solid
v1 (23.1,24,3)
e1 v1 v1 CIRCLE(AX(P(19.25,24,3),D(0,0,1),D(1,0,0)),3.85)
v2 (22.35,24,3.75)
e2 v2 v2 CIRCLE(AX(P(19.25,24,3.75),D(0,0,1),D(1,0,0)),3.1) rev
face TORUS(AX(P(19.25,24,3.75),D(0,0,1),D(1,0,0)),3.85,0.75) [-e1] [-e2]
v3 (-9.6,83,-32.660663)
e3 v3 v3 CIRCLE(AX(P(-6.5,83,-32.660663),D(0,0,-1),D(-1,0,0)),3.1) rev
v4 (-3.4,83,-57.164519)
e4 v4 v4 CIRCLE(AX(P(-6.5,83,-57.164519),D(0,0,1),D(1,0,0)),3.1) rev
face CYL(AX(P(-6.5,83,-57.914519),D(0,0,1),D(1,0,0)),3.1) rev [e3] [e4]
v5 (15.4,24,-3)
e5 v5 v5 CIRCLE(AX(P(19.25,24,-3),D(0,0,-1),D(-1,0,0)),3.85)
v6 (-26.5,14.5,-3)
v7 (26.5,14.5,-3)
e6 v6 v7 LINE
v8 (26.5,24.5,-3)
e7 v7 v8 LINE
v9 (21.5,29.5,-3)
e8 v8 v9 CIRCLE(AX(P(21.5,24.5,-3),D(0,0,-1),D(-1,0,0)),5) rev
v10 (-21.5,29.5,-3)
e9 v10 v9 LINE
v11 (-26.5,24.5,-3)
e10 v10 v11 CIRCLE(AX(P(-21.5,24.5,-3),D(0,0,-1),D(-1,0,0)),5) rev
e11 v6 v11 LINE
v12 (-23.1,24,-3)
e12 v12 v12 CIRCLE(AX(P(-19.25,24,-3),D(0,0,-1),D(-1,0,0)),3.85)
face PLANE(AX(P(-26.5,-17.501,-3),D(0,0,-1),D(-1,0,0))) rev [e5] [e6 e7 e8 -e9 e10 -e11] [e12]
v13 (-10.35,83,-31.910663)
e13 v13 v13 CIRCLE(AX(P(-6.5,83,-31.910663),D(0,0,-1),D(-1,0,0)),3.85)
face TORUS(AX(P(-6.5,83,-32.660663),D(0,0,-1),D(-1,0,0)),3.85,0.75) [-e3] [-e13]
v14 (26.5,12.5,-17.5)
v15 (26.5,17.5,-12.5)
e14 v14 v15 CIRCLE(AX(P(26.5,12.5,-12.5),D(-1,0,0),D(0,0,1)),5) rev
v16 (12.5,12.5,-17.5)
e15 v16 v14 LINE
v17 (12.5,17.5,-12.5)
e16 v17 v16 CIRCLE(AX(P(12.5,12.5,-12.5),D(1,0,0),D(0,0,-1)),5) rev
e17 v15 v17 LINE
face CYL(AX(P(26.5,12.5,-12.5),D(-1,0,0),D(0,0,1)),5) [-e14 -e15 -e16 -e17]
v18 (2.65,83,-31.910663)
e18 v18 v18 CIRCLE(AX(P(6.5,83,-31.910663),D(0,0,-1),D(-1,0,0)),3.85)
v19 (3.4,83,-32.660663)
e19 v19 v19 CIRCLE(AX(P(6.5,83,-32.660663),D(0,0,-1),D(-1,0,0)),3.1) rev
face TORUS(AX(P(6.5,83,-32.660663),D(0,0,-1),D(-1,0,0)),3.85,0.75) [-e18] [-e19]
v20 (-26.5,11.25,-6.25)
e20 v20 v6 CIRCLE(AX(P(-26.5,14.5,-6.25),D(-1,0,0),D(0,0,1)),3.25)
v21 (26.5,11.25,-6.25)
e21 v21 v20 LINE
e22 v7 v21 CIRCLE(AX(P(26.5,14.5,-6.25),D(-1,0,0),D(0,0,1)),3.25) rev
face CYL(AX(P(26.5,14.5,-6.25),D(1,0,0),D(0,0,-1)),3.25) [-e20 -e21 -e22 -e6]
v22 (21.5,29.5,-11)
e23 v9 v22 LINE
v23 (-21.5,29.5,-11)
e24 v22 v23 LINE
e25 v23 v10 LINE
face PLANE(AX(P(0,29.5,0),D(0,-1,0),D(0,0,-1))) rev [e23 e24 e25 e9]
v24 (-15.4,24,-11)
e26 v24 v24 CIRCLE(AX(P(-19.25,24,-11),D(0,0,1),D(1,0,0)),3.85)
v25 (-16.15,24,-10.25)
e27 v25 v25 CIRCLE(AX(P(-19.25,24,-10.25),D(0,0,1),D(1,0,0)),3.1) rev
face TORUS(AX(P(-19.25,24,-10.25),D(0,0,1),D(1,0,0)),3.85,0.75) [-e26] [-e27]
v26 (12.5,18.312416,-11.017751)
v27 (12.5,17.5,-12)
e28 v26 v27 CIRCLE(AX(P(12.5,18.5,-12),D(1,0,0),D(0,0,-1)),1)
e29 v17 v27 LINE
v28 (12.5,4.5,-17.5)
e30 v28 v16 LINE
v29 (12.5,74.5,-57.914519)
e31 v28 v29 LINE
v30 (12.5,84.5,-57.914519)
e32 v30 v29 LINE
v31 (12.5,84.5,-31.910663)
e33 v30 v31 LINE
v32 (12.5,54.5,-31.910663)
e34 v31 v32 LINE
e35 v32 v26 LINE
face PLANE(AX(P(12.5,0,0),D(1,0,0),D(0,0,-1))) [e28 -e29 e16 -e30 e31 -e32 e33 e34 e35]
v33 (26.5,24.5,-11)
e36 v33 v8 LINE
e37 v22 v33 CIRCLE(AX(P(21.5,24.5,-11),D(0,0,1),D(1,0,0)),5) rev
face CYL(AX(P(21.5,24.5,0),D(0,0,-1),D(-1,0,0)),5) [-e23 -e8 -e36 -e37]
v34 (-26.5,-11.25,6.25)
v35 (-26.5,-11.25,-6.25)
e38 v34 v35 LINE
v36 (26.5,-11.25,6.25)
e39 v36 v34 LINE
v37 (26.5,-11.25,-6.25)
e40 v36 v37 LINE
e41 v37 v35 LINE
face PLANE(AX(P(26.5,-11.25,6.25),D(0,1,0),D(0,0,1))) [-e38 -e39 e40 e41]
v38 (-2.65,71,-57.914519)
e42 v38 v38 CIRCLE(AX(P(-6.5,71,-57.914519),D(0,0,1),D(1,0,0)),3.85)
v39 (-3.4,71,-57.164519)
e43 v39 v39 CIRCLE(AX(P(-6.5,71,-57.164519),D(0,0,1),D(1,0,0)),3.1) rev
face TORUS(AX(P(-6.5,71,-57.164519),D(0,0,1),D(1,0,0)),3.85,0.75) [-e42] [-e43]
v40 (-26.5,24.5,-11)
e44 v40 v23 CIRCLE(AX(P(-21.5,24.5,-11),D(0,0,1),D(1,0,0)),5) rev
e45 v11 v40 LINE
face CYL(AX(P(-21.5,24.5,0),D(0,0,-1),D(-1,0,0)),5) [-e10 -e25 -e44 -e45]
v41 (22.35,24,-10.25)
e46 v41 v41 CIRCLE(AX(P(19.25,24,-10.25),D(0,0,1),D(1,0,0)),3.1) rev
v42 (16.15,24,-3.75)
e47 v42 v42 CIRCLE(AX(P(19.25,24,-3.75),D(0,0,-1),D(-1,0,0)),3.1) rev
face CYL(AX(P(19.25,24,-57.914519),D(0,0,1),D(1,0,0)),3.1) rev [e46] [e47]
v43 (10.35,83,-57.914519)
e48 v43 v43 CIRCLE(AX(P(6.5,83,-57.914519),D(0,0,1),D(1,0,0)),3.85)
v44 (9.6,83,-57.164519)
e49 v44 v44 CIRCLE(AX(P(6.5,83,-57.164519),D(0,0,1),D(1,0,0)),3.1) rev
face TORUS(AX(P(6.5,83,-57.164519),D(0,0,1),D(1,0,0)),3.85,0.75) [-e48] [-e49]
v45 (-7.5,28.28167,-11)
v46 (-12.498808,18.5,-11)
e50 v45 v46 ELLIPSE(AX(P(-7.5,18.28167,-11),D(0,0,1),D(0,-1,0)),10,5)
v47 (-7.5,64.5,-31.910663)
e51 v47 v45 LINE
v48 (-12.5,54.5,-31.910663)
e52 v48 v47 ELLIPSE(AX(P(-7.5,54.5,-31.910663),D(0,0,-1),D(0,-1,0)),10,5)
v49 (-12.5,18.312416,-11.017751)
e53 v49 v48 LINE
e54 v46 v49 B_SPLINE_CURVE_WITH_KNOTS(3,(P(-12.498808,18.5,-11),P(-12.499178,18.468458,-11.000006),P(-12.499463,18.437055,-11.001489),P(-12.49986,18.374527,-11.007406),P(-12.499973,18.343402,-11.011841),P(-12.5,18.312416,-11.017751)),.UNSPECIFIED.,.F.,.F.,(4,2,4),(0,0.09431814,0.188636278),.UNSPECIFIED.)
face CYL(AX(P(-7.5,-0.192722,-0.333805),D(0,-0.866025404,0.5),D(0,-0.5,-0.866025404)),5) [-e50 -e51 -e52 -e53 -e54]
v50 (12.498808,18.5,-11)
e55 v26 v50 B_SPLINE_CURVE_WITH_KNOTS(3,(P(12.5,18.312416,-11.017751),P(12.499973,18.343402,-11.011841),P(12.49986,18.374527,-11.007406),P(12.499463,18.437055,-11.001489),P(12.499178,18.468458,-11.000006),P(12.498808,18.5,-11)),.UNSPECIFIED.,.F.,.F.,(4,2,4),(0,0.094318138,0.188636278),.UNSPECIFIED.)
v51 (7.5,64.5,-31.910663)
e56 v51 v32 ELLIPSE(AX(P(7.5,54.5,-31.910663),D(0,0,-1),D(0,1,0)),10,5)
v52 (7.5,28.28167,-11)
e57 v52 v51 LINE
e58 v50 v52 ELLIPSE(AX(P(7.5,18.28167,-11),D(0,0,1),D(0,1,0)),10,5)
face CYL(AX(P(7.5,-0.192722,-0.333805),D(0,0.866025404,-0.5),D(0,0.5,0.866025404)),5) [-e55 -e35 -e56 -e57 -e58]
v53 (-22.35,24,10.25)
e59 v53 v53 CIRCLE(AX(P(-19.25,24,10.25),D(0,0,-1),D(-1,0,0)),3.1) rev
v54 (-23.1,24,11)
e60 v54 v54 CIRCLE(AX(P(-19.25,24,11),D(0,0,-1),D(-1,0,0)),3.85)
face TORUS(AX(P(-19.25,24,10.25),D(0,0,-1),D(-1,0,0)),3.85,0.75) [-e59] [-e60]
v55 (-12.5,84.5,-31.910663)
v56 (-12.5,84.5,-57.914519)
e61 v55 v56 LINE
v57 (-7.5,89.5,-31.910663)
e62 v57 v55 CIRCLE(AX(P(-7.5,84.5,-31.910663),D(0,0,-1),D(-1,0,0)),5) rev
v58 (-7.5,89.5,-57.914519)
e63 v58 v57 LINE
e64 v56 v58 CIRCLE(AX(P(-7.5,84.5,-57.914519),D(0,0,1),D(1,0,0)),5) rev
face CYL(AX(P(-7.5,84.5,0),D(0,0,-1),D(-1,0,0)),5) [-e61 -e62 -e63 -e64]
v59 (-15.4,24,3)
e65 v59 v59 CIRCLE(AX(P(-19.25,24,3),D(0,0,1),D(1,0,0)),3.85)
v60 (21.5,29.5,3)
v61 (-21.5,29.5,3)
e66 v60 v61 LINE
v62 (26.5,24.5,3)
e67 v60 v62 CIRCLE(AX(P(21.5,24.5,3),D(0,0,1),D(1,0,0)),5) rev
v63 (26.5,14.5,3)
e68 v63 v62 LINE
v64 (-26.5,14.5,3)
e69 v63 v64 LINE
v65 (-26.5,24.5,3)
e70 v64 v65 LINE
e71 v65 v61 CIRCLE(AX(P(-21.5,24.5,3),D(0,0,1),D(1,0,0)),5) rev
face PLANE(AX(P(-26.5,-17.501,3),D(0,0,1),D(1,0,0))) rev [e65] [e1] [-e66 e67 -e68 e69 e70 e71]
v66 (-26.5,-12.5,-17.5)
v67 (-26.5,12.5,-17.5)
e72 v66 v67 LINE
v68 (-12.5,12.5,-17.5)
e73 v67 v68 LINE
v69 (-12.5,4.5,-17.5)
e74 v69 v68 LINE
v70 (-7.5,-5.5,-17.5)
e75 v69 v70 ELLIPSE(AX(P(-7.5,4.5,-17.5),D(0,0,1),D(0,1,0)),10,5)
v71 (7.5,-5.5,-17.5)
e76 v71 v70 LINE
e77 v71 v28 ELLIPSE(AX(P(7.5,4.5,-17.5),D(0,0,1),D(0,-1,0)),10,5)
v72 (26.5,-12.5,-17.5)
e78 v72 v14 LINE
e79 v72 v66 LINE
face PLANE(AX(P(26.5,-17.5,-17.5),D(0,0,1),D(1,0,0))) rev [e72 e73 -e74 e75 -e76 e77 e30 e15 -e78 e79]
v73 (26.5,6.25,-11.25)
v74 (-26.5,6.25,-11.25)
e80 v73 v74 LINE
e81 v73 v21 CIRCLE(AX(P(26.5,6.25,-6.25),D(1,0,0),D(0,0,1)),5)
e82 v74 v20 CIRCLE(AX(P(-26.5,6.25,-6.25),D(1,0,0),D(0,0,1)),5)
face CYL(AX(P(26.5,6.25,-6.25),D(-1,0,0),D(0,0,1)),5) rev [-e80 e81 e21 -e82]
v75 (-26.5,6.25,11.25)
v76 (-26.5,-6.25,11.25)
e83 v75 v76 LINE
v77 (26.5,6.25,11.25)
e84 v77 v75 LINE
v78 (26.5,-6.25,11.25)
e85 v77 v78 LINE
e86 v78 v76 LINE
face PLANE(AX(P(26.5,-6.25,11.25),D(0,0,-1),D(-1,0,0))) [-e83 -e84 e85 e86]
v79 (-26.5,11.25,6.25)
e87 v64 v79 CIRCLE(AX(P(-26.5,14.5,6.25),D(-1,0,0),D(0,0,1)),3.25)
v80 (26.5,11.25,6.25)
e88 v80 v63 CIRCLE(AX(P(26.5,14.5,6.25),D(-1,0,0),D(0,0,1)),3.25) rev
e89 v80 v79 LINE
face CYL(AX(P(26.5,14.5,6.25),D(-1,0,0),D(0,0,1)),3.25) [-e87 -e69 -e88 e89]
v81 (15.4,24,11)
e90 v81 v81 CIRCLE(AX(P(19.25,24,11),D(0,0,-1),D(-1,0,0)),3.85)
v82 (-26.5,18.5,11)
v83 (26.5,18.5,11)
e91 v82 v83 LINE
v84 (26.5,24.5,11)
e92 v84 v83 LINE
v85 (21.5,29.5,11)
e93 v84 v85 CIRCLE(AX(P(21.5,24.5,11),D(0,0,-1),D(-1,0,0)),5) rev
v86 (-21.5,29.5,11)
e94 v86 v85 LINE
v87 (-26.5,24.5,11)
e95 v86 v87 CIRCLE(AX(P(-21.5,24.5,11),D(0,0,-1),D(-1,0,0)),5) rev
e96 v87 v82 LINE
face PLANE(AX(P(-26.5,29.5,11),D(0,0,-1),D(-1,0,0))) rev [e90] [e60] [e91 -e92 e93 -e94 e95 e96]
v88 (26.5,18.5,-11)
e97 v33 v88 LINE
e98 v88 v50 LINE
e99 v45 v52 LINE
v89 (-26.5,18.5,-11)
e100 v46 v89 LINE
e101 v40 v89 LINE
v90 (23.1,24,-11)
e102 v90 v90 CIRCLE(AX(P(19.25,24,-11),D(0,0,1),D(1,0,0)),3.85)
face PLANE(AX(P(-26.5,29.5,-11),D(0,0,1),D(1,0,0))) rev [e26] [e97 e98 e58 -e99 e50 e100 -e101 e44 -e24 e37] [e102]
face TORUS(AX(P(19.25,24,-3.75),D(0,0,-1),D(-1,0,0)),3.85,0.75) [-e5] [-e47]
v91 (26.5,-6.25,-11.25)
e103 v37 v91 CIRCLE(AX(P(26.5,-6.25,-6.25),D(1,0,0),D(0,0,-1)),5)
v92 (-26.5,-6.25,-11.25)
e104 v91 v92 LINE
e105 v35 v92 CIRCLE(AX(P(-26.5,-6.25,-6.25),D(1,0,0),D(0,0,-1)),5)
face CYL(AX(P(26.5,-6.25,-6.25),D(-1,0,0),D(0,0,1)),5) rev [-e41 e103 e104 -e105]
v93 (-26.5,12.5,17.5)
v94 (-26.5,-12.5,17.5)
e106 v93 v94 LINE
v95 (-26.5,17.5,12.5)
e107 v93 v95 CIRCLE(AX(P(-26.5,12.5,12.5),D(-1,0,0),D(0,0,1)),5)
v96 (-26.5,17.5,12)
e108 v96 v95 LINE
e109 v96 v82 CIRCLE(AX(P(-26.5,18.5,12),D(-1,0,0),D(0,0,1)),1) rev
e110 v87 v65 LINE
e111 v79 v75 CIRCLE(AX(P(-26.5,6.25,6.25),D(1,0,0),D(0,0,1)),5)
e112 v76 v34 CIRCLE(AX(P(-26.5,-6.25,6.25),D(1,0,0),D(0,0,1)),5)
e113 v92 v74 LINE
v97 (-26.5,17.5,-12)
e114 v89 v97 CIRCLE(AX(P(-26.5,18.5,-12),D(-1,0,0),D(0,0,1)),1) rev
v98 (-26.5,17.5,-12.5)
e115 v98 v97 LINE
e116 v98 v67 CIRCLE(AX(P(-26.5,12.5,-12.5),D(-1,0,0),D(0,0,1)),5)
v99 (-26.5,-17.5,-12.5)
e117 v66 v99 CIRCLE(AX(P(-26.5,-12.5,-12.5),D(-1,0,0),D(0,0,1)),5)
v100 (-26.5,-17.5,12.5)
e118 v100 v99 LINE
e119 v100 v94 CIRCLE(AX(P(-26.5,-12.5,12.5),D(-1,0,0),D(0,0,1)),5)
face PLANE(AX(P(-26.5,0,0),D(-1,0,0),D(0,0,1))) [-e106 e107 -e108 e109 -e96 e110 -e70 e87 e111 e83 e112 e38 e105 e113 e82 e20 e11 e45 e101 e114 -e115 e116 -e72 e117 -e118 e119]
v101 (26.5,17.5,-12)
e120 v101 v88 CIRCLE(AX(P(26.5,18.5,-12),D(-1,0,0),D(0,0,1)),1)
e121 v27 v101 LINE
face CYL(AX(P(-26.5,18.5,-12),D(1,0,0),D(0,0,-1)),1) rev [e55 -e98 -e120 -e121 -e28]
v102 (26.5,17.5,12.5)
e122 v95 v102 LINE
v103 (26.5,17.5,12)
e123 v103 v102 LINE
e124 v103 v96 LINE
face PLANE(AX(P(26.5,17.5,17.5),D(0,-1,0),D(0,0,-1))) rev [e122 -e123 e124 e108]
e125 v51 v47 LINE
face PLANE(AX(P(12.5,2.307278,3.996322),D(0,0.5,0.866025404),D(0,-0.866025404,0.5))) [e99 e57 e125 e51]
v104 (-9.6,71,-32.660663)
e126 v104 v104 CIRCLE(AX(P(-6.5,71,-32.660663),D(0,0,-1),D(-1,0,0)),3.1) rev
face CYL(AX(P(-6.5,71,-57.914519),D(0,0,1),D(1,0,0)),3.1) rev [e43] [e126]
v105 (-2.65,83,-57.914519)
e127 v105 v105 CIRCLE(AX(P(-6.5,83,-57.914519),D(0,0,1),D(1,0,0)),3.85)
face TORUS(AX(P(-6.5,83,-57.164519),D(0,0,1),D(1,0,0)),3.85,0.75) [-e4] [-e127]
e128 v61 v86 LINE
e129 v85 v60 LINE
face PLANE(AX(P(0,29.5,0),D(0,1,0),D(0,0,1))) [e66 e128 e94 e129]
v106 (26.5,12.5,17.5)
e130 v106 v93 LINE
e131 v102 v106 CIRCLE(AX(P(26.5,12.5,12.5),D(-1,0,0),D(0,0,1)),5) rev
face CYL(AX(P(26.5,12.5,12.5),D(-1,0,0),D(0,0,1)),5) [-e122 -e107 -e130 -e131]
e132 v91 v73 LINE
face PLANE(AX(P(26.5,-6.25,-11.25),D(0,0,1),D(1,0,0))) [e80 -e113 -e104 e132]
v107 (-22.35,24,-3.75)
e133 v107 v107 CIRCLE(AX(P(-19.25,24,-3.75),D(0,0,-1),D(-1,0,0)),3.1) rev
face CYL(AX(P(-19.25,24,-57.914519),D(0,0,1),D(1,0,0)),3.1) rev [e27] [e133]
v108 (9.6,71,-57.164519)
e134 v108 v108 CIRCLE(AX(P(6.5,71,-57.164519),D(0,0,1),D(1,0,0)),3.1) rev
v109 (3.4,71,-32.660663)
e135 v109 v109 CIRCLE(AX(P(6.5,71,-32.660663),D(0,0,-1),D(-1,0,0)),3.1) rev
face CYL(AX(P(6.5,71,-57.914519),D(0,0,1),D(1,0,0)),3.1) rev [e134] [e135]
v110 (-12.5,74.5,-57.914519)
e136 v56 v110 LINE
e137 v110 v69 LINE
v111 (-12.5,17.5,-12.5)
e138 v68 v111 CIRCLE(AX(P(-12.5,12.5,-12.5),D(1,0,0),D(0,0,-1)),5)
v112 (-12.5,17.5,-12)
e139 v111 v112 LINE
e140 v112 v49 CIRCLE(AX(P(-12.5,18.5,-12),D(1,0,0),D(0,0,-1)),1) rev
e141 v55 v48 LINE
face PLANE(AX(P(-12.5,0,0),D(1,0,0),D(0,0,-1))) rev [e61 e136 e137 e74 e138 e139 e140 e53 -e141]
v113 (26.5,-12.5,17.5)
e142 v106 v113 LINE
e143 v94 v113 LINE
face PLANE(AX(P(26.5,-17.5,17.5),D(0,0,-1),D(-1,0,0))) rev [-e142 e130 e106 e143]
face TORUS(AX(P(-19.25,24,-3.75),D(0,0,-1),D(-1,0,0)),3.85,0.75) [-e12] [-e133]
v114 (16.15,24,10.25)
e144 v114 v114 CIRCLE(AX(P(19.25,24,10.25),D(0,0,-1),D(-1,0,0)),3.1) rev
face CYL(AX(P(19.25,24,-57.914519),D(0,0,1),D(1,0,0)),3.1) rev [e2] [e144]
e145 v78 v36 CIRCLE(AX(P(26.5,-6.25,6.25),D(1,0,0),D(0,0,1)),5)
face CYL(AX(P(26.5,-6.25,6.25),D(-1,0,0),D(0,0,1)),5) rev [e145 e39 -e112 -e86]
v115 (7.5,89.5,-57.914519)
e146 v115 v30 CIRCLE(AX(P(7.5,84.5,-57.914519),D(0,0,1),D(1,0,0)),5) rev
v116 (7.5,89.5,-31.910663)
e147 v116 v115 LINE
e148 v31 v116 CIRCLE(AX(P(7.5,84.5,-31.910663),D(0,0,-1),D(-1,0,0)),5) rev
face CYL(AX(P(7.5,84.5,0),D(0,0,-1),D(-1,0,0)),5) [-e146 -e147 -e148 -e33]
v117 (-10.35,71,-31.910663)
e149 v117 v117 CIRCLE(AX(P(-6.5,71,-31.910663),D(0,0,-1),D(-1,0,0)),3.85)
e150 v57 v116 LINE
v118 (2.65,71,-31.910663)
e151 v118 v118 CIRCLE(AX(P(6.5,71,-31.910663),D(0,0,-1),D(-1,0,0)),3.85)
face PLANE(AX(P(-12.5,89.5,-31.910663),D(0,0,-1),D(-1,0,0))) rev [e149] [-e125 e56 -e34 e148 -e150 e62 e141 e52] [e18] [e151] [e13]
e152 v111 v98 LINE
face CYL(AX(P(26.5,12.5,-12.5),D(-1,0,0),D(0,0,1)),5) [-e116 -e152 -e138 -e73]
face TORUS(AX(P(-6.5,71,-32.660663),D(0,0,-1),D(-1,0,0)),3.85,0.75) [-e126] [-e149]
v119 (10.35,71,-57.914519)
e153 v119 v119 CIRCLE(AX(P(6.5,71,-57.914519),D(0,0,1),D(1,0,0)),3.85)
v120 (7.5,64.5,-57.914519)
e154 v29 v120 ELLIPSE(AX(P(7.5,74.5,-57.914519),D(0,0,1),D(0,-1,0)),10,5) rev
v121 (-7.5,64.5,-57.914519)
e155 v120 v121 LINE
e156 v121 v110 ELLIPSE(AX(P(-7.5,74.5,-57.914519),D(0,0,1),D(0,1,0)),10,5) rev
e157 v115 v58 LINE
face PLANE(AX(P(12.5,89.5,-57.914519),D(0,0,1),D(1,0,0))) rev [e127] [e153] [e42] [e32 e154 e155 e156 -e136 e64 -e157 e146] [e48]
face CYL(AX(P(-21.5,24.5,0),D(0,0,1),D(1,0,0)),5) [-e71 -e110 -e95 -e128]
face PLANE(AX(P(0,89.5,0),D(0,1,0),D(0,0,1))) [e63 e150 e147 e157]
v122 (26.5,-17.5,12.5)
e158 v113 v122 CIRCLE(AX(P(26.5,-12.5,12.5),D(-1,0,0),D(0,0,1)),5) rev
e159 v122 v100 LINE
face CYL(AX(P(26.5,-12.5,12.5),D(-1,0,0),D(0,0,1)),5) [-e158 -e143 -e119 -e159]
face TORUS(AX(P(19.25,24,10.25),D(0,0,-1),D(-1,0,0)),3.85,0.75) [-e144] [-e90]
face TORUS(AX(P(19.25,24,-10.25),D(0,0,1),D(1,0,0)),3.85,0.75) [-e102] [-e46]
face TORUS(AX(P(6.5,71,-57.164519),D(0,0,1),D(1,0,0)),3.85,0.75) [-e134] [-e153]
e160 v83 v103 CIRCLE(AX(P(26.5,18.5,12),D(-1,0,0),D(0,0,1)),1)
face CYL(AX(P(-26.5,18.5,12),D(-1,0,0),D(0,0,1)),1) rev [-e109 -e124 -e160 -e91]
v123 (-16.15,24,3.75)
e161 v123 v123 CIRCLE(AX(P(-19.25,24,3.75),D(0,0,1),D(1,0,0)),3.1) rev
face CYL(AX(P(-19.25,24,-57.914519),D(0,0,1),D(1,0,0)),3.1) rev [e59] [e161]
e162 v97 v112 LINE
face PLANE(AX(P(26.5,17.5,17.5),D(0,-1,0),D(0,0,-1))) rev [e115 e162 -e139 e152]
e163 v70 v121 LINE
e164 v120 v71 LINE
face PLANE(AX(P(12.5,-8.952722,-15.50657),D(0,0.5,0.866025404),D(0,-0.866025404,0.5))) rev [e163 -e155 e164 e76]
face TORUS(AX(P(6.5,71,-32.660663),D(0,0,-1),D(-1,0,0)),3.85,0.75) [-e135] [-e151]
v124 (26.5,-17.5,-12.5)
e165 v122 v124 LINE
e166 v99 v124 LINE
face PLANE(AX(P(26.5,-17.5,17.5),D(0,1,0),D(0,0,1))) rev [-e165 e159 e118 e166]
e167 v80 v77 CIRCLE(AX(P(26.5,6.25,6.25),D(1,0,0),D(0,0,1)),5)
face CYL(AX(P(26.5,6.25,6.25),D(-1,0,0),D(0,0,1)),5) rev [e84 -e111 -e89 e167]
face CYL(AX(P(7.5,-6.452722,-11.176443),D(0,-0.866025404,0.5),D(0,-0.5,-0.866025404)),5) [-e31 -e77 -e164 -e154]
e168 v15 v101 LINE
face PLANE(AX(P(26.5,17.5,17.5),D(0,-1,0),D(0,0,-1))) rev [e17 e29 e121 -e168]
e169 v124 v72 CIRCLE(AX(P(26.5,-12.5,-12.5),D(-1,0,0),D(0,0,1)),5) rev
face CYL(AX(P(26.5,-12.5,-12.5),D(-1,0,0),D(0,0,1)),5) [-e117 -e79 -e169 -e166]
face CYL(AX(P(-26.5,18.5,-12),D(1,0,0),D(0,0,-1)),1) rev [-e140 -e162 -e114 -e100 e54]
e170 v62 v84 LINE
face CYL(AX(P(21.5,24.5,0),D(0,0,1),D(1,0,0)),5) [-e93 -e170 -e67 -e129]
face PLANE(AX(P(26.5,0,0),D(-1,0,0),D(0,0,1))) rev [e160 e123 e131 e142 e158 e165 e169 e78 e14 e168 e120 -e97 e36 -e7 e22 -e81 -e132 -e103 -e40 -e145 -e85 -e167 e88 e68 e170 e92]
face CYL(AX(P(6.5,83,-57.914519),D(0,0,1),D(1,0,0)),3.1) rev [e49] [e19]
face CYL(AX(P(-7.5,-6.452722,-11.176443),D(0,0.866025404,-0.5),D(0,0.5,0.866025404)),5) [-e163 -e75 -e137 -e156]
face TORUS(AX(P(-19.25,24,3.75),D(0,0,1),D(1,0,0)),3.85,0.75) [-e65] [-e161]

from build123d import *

# Parameters (mm, degrees)
SKETCH1_W           = 35
SKETCH1_H           = 35
BOSS_EXTRUDE1_DEPTH = 26.5
FILLET1_R           = 5
BOSS_EXTRUDE2_DEPTH = 12.5
SKETCH3_W           = 25
SKETCH3_H           = 26.003856124
BOSS_EXTRUDE3_DEPTH = 25
CUT_EXTRUDE1_REACH  = 98.127
SKETCH4_W           = 53
SKETCH4_H           = 6
SKETCH5_W           = 53
SKETCH5_H           = 8
BOSS_EXTRUDE4_DEPTH = 12
SKETCH6_R           = 3.1
CUT_EXTRUDE2_DEPTH  = 117.024613369
FILLET4_R           = 1
FILLET2_R           = 5
FILLET5_R           = 3.25
FILLET6_R           = 0.75
FILLET13_R          = 5


with BuildPart() as part:
    # Sketch1 → Boss-Extrude1 (new, symmetric)
    with BuildSketch(Plane(origin=(0, 0, 0), x_dir=(0, 0, -1), z_dir=(1, 0, 0))):
        Rectangle(SKETCH1_W, SKETCH1_H)
        with BuildLine():
            Line((-6.25, -11.25), (6.25, -11.25))
            ThreePointArc((6.25, -11.25), (9.785533906, -9.785533906), (11.25, -6.25))
            Line((11.25, -6.25), (11.25, 6.25))
            ThreePointArc((11.25, 6.25), (9.785533906, 9.785533906), (6.25, 11.25))
            Line((6.25, 11.25), (-6.25, 11.25))
            ThreePointArc((-6.25, 11.25), (-9.785533906, 9.785533906), (-11.25, 6.25))
            Line((-11.25, 6.25), (-11.25, -6.25))
            ThreePointArc((-11.25, -6.25), (-9.785533906, -9.785533906), (-6.25, -11.25))
        make_face(mode=Mode.SUBTRACT)
    extrude(amount=BOSS_EXTRUDE1_DEPTH, both=True)

    # Fillet1
    fillet1_edges = [part.edges().sort_by_distance(p)[0] for p in [
        (0, -17.5, -17.5),
        (0, -17.5, 17.5),
        (0, 17.5, 17.5),
    ]]
    fillet(fillet1_edges, radius=FILLET1_R)

    # Sketch2 → Boss-Extrude2 (add, symmetric)
    with BuildSketch(Plane(origin=(0, 0, 0), x_dir=(0, 0, -1), z_dir=(1, 0, 0))):
        Polygon((4.775200067, 17.5), (17.5, 17.5), (17.5, -5.5), (57.914518843, 64.5), (31.910662719, 64.5), align=None)
    extrude(amount=BOSS_EXTRUDE2_DEPTH, both=True)

    # Sketch3 → Boss-Extrude3 (add)
    with BuildSketch(Plane(origin=(0, 64.5, 0), x_dir=(1, 0, 0), z_dir=(0, 1, 0))):
        with Locations((0, 44.912590781)):
            Rectangle(SKETCH3_W, SKETCH3_H)
    extrude(amount=BOSS_EXTRUDE3_DEPTH)

    # Sketch4 → Cut-Extrude1 (cut, up to next)
    with BuildSketch(Plane(origin=(0, 17.5, 0), x_dir=(1, 0, 0), z_dir=(0, 1, 0)), mode=Mode.PRIVATE) as cut_extrude1_sk1:
        Rectangle(SKETCH4_W, SKETCH4_H)
    cut_extrude1_tool1 = extrude(cut_extrude1_sk1.sketch, amount=-CUT_EXTRUDE1_REACH, mode=Mode.PRIVATE) & part.part
    add(cut_extrude1_tool1.solids().sort_by_distance((0, 17.5, 0))[0], mode=Mode.SUBTRACT)

    # Sketch5 → Boss-Extrude4 (add)
    with BuildSketch(Plane(origin=(0, 17.5, 0), x_dir=(1, 0, 0), z_dir=(0, 1, 0))):
        with Locations((0, 7)):
            Rectangle(SKETCH5_W, SKETCH5_H)
        with Locations((0, -7)):
            Rectangle(SKETCH5_W, SKETCH5_H)
    extrude(amount=BOSS_EXTRUDE4_DEPTH)

    # Sketch6 → Cut-Extrude2 (cut, through all)
    with BuildSketch(Plane.XY.offset(11)):
        with Locations((-19.25, 24)):
            Circle(SKETCH6_R)
        with Locations((19.25, 24)):
            Circle(SKETCH6_R)
        with Locations((-6.5, 83)):
            Circle(SKETCH6_R)
        with Locations((-6.5, 71)):
            Circle(SKETCH6_R)
        with Locations(Location((6.5, 71, 0), (0, 0, 180))):
            Circle(SKETCH6_R)
        with Locations(Location((6.5, 83, 0), (0, 0, 180))):
            Circle(SKETCH6_R)
    extrude(amount=-CUT_EXTRUDE2_DEPTH, mode=Mode.SUBTRACT)

    # Fillet4
    fillet4_edges = [part.edges().sort_by_distance(p)[0] for p in [
        (-19.5, 17.5, -11),
        (19.5, 17.5, -11),
        (0, 17.5, 11),
    ]]
    fillet(fillet4_edges, radius=FILLET4_R)

    # Fillet2
    fillet2_edges = [part.edges().sort_by_distance(p)[0] for p in [
        (-26.5, 29.5, -7),
        (26.5, 29.5, -7),
        (-26.5, 29.5, 7),
        (26.5, 29.5, 7),
        (-19.5, 17.5, -17.5),
        (-12.5, 29.5, -37.707259422),
        (12.5, 29.5, -37.707259422),
        (-12.5, 89.5, -44.912590781),
        (12.5, 89.5, -44.912590781),
        (19.5, 17.5, -17.5),
    ]]
    fillet(fillet2_edges, radius=FILLET2_R)

    # Fillet5
    fillet5_edges = [part.edges().sort_by_distance(p)[0] for p in [
        (0, 11.25, -3),
        (0, 11.25, 3),
    ]]
    fillet(fillet5_edges, radius=FILLET5_R - 0.0001)  # a hair under: the kernel refuses the full size

    # Fillet6
    fillet6_edges = [part.edges().sort_by_distance(p)[0] for p in [
        (-22.35, 24, 3),
        (-22.35, 24, -11),
        (-22.35, 24, -3),
        (-22.35, 24, 11),
        (9.6, 83, -57.914518843),
        (9.6, 83, -31.910662719),
        (-9.6, 71, -57.914518843),
        (-9.6, 71, -31.910662719),
        (16.15, 24, 3),
        (16.15, 24, -11),
        (16.15, 24, -3),
        (16.15, 24, 11),
        (-9.6, 83, -57.914518843),
        (-9.6, 83, -31.910662719),
        (9.6, 71, -57.914518843),
        (9.6, 71, -31.910662719),
    ]]
    fillet(fillet6_edges, radius=FILLET6_R)

    # Fillet13
    fillet13_edges = [part.edges().sort_by_distance(p)[0] for p in [
        (12.5, 46.390834875, -21.455331359),
        (-12.5, 46.390834875, -21.455331359),
    ]]
    fillet(fillet13_edges, radius=FILLET13_R)


solid = part.part
